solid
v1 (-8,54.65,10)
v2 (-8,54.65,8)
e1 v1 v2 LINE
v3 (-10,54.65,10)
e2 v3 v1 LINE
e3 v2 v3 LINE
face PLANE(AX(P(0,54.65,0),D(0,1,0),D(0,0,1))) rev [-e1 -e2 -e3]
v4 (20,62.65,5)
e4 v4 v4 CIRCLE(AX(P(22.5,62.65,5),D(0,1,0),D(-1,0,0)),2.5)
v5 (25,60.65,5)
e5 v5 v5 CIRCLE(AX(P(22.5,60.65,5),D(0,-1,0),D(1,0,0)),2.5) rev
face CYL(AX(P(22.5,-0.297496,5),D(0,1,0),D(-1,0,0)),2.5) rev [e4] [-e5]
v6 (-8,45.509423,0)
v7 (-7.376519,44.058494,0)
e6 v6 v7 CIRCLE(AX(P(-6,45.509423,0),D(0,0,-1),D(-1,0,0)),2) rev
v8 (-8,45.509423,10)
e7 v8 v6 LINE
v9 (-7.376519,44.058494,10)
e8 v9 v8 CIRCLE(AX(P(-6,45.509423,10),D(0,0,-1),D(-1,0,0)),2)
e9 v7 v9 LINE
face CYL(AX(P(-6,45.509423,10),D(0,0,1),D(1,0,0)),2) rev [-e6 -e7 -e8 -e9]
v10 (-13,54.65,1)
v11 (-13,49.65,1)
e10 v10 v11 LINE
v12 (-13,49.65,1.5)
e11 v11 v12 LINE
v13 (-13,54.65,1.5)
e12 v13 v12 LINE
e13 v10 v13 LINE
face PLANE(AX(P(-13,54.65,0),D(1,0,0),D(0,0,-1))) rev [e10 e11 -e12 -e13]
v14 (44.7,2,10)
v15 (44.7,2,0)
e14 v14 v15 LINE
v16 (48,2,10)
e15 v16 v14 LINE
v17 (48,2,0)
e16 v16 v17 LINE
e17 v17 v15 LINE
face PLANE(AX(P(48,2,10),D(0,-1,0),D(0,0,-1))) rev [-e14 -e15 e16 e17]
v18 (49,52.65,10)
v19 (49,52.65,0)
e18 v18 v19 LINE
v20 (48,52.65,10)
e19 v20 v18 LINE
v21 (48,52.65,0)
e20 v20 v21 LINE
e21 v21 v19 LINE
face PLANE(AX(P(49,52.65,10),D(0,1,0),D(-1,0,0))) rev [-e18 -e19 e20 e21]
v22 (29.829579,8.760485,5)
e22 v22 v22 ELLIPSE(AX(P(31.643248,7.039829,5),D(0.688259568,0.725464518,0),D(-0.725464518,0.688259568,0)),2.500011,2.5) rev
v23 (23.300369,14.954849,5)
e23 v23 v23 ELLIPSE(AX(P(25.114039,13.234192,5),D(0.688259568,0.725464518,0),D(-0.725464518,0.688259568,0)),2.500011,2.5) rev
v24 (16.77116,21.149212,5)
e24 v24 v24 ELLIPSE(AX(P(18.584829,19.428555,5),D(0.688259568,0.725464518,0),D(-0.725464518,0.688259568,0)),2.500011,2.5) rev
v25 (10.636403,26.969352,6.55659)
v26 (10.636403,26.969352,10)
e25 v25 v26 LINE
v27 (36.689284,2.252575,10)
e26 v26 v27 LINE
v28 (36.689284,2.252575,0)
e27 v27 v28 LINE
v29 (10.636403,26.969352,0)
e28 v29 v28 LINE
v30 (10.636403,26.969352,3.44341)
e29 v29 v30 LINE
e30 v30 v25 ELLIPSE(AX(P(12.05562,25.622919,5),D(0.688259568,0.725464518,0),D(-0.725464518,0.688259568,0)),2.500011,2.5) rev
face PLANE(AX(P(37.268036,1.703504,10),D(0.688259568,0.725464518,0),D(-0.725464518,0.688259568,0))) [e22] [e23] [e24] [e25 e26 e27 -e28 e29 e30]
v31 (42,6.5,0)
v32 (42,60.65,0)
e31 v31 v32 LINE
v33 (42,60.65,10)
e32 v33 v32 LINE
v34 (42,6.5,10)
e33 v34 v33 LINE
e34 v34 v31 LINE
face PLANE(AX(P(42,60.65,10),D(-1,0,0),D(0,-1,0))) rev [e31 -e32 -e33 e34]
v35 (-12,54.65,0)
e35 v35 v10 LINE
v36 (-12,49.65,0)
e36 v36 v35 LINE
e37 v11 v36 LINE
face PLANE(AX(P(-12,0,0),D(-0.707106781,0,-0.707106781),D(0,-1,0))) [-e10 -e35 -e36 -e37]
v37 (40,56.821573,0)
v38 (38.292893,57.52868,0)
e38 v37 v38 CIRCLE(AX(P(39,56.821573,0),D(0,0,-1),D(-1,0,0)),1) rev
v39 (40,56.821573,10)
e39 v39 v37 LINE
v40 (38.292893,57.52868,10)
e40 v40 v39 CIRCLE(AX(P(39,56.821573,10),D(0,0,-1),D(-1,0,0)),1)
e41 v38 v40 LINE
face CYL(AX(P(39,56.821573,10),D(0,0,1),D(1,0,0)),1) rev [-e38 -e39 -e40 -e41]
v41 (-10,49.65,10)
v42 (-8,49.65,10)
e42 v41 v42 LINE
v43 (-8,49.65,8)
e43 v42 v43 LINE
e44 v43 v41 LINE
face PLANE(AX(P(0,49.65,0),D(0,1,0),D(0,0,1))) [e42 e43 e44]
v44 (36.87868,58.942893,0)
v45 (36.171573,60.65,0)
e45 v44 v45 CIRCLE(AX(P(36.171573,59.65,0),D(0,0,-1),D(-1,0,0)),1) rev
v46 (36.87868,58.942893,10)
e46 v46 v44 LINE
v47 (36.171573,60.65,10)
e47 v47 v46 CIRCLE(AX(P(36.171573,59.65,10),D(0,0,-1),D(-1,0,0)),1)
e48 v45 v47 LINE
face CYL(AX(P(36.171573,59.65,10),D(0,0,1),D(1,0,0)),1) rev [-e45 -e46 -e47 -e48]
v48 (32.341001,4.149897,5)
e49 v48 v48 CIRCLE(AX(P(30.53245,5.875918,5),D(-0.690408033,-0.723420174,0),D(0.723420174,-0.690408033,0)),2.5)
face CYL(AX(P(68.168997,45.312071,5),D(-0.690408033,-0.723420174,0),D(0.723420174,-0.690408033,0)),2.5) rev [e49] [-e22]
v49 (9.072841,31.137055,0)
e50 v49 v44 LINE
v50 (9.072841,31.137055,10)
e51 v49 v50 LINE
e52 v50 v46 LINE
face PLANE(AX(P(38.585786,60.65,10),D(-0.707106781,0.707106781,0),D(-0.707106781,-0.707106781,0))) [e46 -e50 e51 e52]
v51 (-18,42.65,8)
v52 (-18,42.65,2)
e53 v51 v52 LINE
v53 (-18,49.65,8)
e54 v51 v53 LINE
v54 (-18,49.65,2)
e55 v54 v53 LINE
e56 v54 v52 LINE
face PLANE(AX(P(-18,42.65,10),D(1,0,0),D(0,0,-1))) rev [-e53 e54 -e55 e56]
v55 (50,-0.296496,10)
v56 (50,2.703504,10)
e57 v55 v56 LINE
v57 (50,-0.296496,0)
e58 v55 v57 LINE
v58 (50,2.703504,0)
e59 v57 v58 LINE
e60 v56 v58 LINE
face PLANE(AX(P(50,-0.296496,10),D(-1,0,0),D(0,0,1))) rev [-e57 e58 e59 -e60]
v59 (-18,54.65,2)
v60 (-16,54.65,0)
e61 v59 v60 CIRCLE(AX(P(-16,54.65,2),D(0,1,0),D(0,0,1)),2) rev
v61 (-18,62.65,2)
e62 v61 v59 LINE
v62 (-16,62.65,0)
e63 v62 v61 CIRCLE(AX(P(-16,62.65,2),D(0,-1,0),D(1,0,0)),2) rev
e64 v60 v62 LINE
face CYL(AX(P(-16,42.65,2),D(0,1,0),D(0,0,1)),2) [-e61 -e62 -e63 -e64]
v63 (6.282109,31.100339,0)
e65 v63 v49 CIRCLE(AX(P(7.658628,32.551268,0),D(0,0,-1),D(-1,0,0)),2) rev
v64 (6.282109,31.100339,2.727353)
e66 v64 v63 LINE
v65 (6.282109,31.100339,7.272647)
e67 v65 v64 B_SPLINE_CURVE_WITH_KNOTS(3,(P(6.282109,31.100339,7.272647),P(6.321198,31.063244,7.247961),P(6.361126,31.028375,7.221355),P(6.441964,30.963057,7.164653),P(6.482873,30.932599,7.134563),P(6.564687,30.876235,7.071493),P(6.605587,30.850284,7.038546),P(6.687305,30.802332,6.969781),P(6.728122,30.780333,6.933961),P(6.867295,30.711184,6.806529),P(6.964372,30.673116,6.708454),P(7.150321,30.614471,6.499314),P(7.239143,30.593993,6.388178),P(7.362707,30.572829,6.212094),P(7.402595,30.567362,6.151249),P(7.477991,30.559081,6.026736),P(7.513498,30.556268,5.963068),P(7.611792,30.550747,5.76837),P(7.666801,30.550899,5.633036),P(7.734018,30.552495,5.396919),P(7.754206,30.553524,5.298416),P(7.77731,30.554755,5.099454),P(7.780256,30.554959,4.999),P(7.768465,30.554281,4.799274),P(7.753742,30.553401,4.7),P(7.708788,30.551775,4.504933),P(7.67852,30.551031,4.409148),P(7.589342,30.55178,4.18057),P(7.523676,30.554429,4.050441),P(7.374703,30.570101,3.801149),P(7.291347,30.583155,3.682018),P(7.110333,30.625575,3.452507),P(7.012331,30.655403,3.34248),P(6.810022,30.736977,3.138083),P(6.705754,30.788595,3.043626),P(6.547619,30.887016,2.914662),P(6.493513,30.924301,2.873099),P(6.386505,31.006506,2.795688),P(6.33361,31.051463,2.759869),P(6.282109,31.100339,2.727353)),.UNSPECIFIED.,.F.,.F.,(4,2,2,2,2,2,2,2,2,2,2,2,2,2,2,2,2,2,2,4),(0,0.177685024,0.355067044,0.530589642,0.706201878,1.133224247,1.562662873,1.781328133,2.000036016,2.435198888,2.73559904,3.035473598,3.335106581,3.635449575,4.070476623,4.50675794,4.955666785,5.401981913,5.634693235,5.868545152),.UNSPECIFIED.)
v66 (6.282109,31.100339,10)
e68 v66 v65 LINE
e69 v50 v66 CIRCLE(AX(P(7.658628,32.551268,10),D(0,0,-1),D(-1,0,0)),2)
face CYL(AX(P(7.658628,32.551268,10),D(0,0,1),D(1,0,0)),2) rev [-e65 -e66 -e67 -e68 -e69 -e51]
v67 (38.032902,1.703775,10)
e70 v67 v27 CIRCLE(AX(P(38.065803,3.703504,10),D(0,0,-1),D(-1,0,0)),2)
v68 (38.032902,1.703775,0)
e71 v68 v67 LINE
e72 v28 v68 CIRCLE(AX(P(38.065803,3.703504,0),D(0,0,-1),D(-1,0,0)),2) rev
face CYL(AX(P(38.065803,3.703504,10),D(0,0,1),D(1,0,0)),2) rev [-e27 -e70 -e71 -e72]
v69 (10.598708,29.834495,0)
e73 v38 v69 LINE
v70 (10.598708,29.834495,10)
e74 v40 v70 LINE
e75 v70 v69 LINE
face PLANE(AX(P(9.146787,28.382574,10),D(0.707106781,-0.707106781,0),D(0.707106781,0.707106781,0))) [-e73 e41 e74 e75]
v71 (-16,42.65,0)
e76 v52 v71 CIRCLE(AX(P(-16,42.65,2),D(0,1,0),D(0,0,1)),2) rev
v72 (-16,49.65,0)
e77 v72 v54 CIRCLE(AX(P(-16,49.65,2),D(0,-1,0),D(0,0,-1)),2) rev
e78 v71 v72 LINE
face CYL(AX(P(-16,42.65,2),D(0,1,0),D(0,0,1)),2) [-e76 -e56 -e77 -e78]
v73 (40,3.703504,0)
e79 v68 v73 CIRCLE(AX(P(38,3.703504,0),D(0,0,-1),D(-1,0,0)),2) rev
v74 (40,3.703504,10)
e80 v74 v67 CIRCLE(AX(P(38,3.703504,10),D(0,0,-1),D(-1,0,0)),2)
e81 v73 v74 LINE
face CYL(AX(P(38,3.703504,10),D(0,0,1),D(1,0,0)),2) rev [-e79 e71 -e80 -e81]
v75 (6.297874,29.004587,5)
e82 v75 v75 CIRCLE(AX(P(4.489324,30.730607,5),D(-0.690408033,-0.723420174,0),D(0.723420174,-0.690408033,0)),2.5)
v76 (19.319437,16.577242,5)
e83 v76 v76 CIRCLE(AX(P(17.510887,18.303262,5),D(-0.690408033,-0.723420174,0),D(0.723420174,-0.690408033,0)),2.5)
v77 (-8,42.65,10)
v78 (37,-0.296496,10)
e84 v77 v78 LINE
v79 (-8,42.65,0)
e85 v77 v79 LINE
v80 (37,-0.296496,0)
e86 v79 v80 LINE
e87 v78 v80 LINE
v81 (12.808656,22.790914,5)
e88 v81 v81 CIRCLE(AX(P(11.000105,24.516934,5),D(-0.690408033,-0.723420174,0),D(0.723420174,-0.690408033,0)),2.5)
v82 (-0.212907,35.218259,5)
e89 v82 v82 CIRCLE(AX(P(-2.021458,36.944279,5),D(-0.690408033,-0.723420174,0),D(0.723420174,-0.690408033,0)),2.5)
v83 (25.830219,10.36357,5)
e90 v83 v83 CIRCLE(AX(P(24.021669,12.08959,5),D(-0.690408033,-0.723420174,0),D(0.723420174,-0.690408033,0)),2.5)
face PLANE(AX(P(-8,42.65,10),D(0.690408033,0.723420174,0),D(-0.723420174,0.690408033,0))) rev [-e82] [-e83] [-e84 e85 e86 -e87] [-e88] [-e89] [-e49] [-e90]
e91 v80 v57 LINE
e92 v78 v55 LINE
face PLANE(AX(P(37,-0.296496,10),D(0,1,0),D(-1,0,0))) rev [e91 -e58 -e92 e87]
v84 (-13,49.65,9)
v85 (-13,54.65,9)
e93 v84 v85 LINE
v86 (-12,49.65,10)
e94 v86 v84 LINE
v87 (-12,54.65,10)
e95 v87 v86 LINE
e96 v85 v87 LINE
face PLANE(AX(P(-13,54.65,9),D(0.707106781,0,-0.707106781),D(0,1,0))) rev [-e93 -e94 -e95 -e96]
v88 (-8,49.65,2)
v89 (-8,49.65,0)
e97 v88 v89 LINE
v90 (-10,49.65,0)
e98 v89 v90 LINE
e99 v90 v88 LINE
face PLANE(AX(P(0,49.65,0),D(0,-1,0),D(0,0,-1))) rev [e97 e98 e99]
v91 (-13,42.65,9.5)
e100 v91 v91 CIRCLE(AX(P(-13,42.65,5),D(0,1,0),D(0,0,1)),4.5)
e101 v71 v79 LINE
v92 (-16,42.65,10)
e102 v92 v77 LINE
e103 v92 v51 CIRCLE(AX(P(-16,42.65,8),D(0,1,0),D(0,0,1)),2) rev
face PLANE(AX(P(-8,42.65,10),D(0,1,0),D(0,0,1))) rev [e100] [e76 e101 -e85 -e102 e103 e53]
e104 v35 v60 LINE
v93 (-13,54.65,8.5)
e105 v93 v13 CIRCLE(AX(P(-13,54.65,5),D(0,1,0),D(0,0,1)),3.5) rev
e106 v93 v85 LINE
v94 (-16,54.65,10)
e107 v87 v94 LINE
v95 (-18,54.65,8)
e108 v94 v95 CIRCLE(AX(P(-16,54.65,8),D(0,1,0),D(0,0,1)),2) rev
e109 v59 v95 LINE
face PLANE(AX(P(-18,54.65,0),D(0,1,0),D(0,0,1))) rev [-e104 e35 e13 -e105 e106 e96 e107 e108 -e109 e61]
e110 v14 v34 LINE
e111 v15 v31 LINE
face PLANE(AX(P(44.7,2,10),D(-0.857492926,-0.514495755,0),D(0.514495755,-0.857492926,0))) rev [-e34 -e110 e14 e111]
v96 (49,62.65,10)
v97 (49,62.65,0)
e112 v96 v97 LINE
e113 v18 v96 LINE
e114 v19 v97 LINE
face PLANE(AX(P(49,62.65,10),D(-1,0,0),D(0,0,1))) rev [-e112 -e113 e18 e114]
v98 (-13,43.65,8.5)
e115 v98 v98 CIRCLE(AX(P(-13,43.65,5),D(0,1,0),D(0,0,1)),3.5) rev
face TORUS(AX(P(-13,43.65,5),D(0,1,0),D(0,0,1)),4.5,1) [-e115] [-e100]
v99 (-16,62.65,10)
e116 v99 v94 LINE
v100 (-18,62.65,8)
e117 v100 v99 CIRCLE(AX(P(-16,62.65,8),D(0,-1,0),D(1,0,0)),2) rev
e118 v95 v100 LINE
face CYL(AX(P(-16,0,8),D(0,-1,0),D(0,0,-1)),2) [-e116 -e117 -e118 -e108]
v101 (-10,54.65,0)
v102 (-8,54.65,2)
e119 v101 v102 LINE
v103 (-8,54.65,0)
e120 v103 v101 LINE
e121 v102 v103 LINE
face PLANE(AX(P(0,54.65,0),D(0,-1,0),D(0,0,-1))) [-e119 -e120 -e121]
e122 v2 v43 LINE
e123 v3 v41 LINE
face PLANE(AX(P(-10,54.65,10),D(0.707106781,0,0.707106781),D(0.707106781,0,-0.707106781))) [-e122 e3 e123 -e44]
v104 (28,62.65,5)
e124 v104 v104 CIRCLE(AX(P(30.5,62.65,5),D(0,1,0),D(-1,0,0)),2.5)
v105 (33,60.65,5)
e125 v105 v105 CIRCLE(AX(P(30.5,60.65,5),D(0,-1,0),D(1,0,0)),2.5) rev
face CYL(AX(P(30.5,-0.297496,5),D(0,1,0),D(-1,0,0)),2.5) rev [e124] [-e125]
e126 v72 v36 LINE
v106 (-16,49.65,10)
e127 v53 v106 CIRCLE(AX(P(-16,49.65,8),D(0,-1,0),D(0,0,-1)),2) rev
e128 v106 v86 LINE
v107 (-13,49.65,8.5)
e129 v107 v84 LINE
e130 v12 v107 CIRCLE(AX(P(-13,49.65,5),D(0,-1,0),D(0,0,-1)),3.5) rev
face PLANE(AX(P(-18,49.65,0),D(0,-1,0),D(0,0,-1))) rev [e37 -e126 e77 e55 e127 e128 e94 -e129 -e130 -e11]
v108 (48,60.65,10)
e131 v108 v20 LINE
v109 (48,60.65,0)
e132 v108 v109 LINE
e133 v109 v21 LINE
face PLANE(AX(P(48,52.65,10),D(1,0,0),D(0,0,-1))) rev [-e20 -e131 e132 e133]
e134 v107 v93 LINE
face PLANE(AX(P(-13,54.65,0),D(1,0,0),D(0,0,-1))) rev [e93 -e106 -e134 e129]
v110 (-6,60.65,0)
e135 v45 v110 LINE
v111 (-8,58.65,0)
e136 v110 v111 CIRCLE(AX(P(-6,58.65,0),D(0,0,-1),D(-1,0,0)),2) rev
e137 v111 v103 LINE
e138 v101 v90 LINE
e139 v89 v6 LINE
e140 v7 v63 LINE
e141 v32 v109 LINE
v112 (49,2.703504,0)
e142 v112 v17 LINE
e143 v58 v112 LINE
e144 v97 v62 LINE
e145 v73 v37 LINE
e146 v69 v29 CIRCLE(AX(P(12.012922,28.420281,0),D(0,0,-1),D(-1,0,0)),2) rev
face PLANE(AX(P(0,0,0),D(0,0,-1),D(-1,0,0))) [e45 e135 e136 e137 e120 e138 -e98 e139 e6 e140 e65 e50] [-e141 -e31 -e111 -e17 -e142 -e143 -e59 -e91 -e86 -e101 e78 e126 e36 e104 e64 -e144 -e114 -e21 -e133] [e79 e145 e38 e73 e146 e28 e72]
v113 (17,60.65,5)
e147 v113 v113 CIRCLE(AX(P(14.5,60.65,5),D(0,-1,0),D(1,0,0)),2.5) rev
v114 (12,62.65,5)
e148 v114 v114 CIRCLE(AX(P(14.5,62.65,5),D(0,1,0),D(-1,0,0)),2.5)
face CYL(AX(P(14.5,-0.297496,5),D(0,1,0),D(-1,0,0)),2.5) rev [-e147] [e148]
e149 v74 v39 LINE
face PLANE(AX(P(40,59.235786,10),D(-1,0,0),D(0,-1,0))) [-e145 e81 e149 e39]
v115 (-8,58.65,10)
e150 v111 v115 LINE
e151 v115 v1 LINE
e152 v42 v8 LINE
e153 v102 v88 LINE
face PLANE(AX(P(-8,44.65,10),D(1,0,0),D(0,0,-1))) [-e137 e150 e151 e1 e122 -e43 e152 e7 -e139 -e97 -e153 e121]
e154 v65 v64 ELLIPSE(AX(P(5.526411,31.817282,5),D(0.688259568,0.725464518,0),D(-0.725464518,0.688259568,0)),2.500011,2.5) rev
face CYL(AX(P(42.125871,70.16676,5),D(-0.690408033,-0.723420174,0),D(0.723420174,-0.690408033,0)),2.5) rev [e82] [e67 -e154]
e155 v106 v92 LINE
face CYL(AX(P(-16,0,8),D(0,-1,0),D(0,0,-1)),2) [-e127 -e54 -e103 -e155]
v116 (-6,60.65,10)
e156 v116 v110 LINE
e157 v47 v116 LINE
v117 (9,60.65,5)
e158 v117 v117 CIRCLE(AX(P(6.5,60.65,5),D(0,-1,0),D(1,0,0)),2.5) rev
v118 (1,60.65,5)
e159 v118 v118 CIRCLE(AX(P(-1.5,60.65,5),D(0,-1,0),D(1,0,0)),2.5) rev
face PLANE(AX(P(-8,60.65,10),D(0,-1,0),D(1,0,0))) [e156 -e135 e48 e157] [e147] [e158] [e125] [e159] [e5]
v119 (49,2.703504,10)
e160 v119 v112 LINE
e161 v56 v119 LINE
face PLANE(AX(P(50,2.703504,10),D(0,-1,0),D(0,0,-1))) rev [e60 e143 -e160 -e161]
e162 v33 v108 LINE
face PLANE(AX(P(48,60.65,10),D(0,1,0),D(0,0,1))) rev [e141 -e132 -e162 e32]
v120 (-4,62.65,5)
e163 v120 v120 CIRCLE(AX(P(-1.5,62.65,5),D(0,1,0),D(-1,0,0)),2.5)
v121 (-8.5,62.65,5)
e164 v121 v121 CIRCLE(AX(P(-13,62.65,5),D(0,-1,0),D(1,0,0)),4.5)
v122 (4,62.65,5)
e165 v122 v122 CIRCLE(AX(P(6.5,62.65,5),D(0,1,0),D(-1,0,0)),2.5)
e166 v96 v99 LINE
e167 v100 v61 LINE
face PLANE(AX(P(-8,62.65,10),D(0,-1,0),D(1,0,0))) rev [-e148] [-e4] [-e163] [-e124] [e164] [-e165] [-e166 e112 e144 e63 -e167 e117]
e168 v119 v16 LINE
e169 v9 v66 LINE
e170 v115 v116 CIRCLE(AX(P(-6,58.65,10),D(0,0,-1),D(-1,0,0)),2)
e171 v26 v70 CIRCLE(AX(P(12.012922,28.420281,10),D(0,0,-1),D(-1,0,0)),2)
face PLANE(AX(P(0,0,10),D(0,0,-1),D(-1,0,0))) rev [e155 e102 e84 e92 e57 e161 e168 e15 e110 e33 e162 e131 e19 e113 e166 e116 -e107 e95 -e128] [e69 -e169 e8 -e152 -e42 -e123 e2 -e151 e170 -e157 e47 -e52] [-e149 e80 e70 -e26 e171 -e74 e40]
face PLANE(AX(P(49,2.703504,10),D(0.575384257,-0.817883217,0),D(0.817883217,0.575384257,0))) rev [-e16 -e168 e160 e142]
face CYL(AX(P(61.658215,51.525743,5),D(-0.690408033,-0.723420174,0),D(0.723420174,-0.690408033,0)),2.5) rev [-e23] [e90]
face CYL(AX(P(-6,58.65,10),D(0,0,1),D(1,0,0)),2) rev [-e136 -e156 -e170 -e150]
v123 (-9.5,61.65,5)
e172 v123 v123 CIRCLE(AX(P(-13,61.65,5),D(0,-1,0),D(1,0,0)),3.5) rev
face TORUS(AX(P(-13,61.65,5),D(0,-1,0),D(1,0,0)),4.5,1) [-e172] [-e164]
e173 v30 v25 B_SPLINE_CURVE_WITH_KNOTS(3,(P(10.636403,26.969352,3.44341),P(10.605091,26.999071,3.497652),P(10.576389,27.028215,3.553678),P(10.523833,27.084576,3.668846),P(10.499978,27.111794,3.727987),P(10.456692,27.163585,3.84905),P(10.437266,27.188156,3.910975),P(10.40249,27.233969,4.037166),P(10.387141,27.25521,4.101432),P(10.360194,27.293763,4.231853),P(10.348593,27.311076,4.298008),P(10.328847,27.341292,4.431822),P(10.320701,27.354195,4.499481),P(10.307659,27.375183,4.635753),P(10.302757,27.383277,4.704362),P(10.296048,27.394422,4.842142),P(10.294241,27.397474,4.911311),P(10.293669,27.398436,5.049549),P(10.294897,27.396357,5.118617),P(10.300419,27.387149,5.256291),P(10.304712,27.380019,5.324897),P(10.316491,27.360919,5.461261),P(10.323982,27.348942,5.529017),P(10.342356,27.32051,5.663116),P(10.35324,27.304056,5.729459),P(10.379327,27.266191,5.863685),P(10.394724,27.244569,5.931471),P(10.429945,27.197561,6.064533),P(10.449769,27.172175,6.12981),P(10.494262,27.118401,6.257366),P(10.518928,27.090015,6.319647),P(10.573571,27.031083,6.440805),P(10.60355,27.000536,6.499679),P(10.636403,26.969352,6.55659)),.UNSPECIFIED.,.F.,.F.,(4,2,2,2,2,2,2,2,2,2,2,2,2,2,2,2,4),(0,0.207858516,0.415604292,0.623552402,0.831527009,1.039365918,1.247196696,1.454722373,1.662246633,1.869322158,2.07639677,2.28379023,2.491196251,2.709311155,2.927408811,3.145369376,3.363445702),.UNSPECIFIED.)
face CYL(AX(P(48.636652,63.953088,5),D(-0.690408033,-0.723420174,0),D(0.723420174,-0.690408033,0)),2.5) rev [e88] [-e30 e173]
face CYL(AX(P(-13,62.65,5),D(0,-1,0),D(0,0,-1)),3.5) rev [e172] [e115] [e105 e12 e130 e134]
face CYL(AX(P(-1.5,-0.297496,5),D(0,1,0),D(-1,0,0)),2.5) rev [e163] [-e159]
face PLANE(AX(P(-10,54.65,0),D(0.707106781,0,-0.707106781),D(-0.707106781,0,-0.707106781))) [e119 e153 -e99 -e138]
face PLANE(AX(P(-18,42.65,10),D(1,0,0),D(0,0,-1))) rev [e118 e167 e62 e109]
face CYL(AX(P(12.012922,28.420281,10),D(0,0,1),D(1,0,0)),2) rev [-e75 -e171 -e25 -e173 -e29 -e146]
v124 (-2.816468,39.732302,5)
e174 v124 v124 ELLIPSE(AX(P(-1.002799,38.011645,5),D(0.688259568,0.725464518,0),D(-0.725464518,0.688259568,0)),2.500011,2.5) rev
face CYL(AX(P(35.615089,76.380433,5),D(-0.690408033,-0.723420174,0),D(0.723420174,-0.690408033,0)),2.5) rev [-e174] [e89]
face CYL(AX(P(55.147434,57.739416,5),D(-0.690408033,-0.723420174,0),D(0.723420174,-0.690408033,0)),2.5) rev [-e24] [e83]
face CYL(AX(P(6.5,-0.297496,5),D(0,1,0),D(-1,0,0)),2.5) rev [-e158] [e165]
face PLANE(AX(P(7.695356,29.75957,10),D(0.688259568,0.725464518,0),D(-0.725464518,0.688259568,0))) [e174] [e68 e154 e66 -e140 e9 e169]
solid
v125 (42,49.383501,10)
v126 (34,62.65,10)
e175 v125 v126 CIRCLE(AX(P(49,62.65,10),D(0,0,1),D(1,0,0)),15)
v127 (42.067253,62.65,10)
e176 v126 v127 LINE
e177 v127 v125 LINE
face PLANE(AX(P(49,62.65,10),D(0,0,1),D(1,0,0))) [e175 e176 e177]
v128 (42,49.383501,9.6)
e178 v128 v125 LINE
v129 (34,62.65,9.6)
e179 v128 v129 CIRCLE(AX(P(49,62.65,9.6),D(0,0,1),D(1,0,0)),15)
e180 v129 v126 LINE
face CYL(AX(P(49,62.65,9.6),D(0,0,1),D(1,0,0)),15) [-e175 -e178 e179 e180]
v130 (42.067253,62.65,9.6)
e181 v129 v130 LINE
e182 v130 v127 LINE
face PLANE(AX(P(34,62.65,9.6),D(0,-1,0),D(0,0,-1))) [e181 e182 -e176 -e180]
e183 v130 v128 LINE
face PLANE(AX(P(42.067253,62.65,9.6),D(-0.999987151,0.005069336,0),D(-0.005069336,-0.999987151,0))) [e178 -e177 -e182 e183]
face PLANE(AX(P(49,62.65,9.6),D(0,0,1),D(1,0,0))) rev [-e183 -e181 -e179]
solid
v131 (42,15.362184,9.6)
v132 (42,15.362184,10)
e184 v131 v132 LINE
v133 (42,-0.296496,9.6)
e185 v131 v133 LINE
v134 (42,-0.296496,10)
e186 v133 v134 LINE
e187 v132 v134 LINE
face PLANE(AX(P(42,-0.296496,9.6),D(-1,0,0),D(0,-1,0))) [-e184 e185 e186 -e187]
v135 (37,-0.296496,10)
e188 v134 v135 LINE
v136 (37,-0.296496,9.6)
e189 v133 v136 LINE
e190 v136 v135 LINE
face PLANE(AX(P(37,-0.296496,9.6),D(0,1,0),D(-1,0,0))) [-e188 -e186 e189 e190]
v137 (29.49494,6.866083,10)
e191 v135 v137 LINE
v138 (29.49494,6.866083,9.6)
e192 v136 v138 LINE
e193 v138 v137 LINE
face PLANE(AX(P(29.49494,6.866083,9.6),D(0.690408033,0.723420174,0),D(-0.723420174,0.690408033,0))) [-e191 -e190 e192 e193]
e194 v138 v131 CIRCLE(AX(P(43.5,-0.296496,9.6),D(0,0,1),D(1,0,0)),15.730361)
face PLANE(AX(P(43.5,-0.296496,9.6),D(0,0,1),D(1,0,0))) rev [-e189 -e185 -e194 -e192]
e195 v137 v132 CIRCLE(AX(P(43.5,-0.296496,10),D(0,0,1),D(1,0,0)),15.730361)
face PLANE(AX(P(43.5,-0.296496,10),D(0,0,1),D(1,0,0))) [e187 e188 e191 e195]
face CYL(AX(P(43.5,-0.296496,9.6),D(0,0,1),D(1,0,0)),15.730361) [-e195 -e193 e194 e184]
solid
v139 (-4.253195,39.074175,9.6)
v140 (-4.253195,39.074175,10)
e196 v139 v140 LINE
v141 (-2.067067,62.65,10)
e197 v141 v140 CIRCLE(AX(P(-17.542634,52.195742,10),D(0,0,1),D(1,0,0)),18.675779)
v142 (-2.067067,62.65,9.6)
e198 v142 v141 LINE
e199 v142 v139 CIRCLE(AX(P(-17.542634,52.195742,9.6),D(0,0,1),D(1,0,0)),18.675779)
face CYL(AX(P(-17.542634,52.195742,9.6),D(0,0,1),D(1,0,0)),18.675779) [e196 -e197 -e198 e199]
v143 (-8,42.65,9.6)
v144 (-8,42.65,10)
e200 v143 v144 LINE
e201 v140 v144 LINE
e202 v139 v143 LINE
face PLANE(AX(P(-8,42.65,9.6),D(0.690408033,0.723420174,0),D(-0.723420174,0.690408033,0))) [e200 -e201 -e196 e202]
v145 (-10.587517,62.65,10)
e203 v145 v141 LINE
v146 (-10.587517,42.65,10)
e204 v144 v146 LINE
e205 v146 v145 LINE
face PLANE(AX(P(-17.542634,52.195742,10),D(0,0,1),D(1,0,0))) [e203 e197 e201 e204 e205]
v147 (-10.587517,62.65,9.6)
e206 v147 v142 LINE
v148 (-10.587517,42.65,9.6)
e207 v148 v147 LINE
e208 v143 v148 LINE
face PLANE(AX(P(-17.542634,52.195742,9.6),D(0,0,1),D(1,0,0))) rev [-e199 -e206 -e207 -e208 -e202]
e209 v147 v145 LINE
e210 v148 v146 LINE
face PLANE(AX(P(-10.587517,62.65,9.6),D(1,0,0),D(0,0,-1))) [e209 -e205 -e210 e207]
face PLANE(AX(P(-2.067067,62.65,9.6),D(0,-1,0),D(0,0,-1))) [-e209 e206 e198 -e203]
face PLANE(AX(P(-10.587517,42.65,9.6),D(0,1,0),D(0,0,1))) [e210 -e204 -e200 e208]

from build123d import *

# Parameters (mm, degrees)
FRAME_DEPTH         = 10
SKETCH13_R          = 3.5
CUT_EXTRUDE7_DEPTH  = 67.66634461
FILLET4_R           = 1
SKETCH14_W          = 5
SKETCH14_H          = 5
CUT_EXTRUDE8_DEPTH  = 81.777611378
FILLET5_R           = 2
CUT_EXTRUDE9_DEPTH  = 5
CHAMFER1_SIZE       = 1
FILLET6_R           = 2
FILLET7_R           = 1
CUT_EXTRUDE11_REACH = 59.656
SKETCH18_R          = 2.5
CUT_EXTRUDE12_REACH = 83.008
SKETCH19_R          = 2.5
EARS_DEPTH          = 0.4
EARS_2_DEPTH        = 0.4
EARS_3_DEPTH        = 0.4


with BuildPart() as part:
    # Sketch1 → Frame (new body)
    with BuildSketch(Plane.XY):
        Polygon((-8, 62.65), (49, 62.65), (49, 52.65), (48, 52.65), (48, 60.65), (42, 60.65), (42, 6.5), (44.7, 2), (48, 2), (49, 2.703504174), (50, 2.703504174), (50, -0.296495826), (37, -0.296495826), (-8, 42.65), (-18, 42.65), (-18, 62.65), align=None)
        Polygon((-8, 44.65), (-8, 60.65), (38.585786438, 60.65), (7.695355997, 29.759569559), align=None, mode=Mode.SUBTRACT)
        Polygon((40, 59.235786438), (40, 1.703504174), (37.268035971, 1.703504174), (9.146787391, 28.382573828), align=None, mode=Mode.SUBTRACT)
    extrude(amount=FRAME_DEPTH)

    # Sketch13 → Cut-Extrude7 (cut, through all)
    with BuildSketch(Plane.XZ.offset(-42.65)):
        with Locations(Location((-13, 5, 0), (0, 0, 270))):
            Circle(SKETCH13_R)
    extrude(amount=-CUT_EXTRUDE7_DEPTH, mode=Mode.SUBTRACT)

    # Fillet4
    fillet4_edges = [part.edges().sort_by_distance(p)[0] for p in [
        (-13, 62.65, 8.5),
        (-13, 42.65, 8.5),
    ]]
    fillet(fillet4_edges, radius=FILLET4_R)

    # Sketch14 → Cut-Extrude8 (cut, through all)
    with BuildSketch(Plane.XY.offset(10)):
        with Locations((-15.5, 52.15)):
            Rectangle(SKETCH14_W, SKETCH14_H)
    extrude(amount=-CUT_EXTRUDE8_DEPTH, mode=Mode.SUBTRACT)

    # Fillet5
    fillet5_edges = [part.edges().sort_by_distance(p)[0] for p in [
        (-18, 58.65, 0),
        (-18, 58.65, 10),
        (-18, 46.15, 0),
        (-18, 46.15, 10),
    ]]
    fillet(fillet5_edges, radius=FILLET5_R)

    # Sketch15 → Cut-Extrude9 (cut)
    with BuildSketch(Plane(origin=(0, 49.65, 0), x_dir=(1, 0, 0), z_dir=(0, 1, 0))):
        Polygon((-10, 0), (-8, -2), (-8, 0), align=None)
        Polygon((-10, -10), (-8, -8), (-8, -10), align=None)
    extrude(amount=CUT_EXTRUDE9_DEPTH, mode=Mode.SUBTRACT)

    # Chamfer1
    chamfer1_edges = [part.edges().sort_by_distance(p)[0] for p in [
        (-13, 52.15, 0),
        (-13, 52.15, 10),
    ]]
    chamfer(chamfer1_edges, length=CHAMFER1_SIZE)

    # Fillet6
    # the kernel refuses this fillet: 2 mm, written as the material it adds along each edge
    with BuildSketch(Plane(origin=(-8, 60.65, 0), x_dir=(0, -1, 0), z_dir=(0, 0, 1)), Plane(origin=(40, 1.703504174, 0), x_dir=(0, 1, 0), z_dir=(0, 0, 1))) as fillet6_piece_1:
        with BuildLine():
            CenterArc((FILLET6_R, FILLET6_R), FILLET6_R, 180, 90)
            Line((0, FILLET6_R), (0, 0))
            Line((0, 0), (FILLET6_R, 0))
        make_face()
    extrude(amount=10)
    with BuildSketch(Plane(origin=(37.268035971, 1.703504174, 0), x_dir=(1, 0, 0), z_dir=(0, 0, 1))) as fillet6_piece_2:
        with BuildLine():
            CenterArc((FILLET6_R * 0.398883640348, FILLET6_R), FILLET6_R, 226.507503973, 43.492496027)
            Line((-FILLET6_R * 0.289375927855, FILLET6_R * 0.274535482069), (0, 0))
            Line((0, 0), (FILLET6_R * 0.398883640348, 0))
        make_face()
    extrude(amount=10)
    with BuildSketch(Plane(origin=(-8, 44.65, 0), x_dir=(0, 1, 0), z_dir=(0, 0, 1))) as fillet6_piece_3:
        with BuildLine():
            CenterArc((FILLET6_R * 0.429711480151, -FILLET6_R), FILLET6_R, 90, 46.507503973)
            Line((-FILLET6_R * 0.29575303778, -FILLET6_R * 0.311740431797), (0, 0))
            Line((0, 0), (FILLET6_R * 0.429711480151, 0))
        make_face()
    extrude(amount=10)
    with BuildSketch(Plane(origin=(9.146787391, 28.382573828, 0), x_dir=(0.7254645179309741, -0.6882595682031448, 0), z_dir=(0, 0, 1))) as fillet6_piece_4:
        with BuildLine():
            CenterArc((FILLET6_R * 1.02666321267, FILLET6_R), FILLET6_R, 178.492496027, 91.507503973)
            Line((FILLET6_R * 0.0270093246389, FILLET6_R * 1.02630787225), (0, 0))
            Line((0, 0), (FILLET6_R * 1.02666321267, 0))
        make_face()
    extrude(amount=10)
    with BuildSketch(Plane(origin=(7.695355997, 29.759569559, 0), x_dir=(0.7071067811865478, 0.7071067811865474, 0), z_dir=(0, 0, 1))) as fillet6_piece_5:
        with BuildLine():
            CenterArc((FILLET6_R * 0.974029250934, FILLET6_R), FILLET6_R, 181.507503973, 88.492496027)
            Line((-FILLET6_R * 0.0256246370977, FILLET6_R * 0.973692127754), (0, 0))
            Line((0, 0), (FILLET6_R * 0.974029250934, 0))
        make_face()
    extrude(amount=10)

    # Fillet7
    fillet7_edges = [part.edges().sort_by_distance(p)[0] for p in [
        (38.585786438, 60.65, 5),
        (40, 59.235786438, 5),
    ]]
    fillet(fillet7_edges, radius=FILLET7_R)

    # Sketch18 → Cut-Extrude11 (cut, up to next)
    with BuildSketch(Plane(origin=(17.488453969, 18.324671512, 0), x_dir=(0.7234201739583832, -0.6904080329124386, 0), z_dir=(-0.6904080329124386, -0.7234201739583832, 0)), mode=Mode.PRIVATE) as cut_extrude11_sk1:
        with Locations((-26.968990252, 5)):
            Circle(SKETCH18_R)
    cut_extrude11_tool1 = extrude(cut_extrude11_sk1.sketch, amount=-CUT_EXTRUDE11_REACH, mode=Mode.PRIVATE) & part.part
    # Sketch18 → Cut-Extrude11 (cut, up to next)
    with BuildSketch(Plane(origin=(17.488453969, 18.324671512, 0), x_dir=(0.7234201739583832, -0.6904080329124386, 0), z_dir=(-0.6904080329124386, -0.7234201739583832, 0)), mode=Mode.PRIVATE) as cut_extrude11_sk2:
        with Locations((-17.968990252, 5)):
            Circle(SKETCH18_R)
    cut_extrude11_tool2 = extrude(cut_extrude11_sk2.sketch, amount=-CUT_EXTRUDE11_REACH, mode=Mode.PRIVATE) & part.part
    # Sketch18 → Cut-Extrude11 (cut, up to next)
    with BuildSketch(Plane(origin=(17.488453969, 18.324671512, 0), x_dir=(0.7234201739583832, -0.6904080329124386, 0), z_dir=(-0.6904080329124386, -0.7234201739583832, 0)), mode=Mode.PRIVATE) as cut_extrude11_sk3:
        with Locations((-8.968990252, 5)):
            Circle(SKETCH18_R)
    cut_extrude11_tool3 = extrude(cut_extrude11_sk3.sketch, amount=-CUT_EXTRUDE11_REACH, mode=Mode.PRIVATE) & part.part
    # Sketch18 → Cut-Extrude11 (cut, up to next)
    with BuildSketch(Plane(origin=(17.488453969, 18.324671512, 0), x_dir=(0.7234201739583832, -0.6904080329124386, 0), z_dir=(-0.6904080329124386, -0.7234201739583832, 0)), mode=Mode.PRIVATE) as cut_extrude11_sk4:
        with Locations((0.031009748, 5)):
            Circle(SKETCH18_R)
    cut_extrude11_tool4 = extrude(cut_extrude11_sk4.sketch, amount=-CUT_EXTRUDE11_REACH, mode=Mode.PRIVATE) & part.part
    # Sketch18 → Cut-Extrude11 (cut, up to next)
    with BuildSketch(Plane(origin=(17.488453969, 18.324671512, 0), x_dir=(0.7234201739583832, -0.6904080329124386, 0), z_dir=(-0.6904080329124386, -0.7234201739583832, 0)), mode=Mode.PRIVATE) as cut_extrude11_sk5:
        with Locations((9.031009748, 5)):
            Circle(SKETCH18_R)
    cut_extrude11_tool5 = extrude(cut_extrude11_sk5.sketch, amount=-CUT_EXTRUDE11_REACH, mode=Mode.PRIVATE) & part.part
    # Sketch18 → Cut-Extrude11 (cut, up to next)
    with BuildSketch(Plane(origin=(17.488453969, 18.324671512, 0), x_dir=(0.7234201739583832, -0.6904080329124386, 0), z_dir=(-0.6904080329124386, -0.7234201739583832, 0)), mode=Mode.PRIVATE) as cut_extrude11_sk6:
        with Locations((18.031009748, 5)):
            Circle(SKETCH18_R)
    cut_extrude11_tool6 = extrude(cut_extrude11_sk6.sketch, amount=-CUT_EXTRUDE11_REACH, mode=Mode.PRIVATE) & part.part
    add(cut_extrude11_tool1.solids().sort_by_distance((-2.021458, 36.944279, 5))[0], mode=Mode.SUBTRACT)
    add(cut_extrude11_tool2.solids().sort_by_distance((4.489324, 30.730607, 5))[0], mode=Mode.SUBTRACT)
    add(cut_extrude11_tool3.solids().sort_by_distance((11.000105, 24.516934, 5))[0], mode=Mode.SUBTRACT)
    add(cut_extrude11_tool4.solids().sort_by_distance((17.510887, 18.303262, 5))[0], mode=Mode.SUBTRACT)
    add(cut_extrude11_tool5.solids().sort_by_distance((24.021669, 12.08959, 5))[0], mode=Mode.SUBTRACT)
    add(cut_extrude11_tool6.solids().sort_by_distance((30.53245, 5.875918, 5))[0], mode=Mode.SUBTRACT)

    # Sketch19 → Cut-Extrude12 (cut, up to next)
    with BuildSketch(Plane(origin=(0, 62.65, 0), x_dir=(1, 0, 0), z_dir=(0, 1, 0)), mode=Mode.PRIVATE) as cut_extrude12_sk1:
        with Locations(Location((-1.5, -5, 0), (0, 0, 180))):
            Circle(SKETCH19_R)
    cut_extrude12_tool1 = extrude(cut_extrude12_sk1.sketch, amount=-CUT_EXTRUDE12_REACH, mode=Mode.PRIVATE) & part.part
    # Sketch19 → Cut-Extrude12 (cut, up to next)
    with BuildSketch(Plane(origin=(0, 62.65, 0), x_dir=(1, 0, 0), z_dir=(0, 1, 0)), mode=Mode.PRIVATE) as cut_extrude12_sk2:
        with Locations(Location((6.5, -5, 0), (0, 0, 180))):
            Circle(SKETCH19_R)
    cut_extrude12_tool2 = extrude(cut_extrude12_sk2.sketch, amount=-CUT_EXTRUDE12_REACH, mode=Mode.PRIVATE) & part.part
    # Sketch19 → Cut-Extrude12 (cut, up to next)
    with BuildSketch(Plane(origin=(0, 62.65, 0), x_dir=(1, 0, 0), z_dir=(0, 1, 0)), mode=Mode.PRIVATE) as cut_extrude12_sk3:
        with Locations(Location((14.5, -5, 0), (0, 0, 180))):
            Circle(SKETCH19_R)
    cut_extrude12_tool3 = extrude(cut_extrude12_sk3.sketch, amount=-CUT_EXTRUDE12_REACH, mode=Mode.PRIVATE) & part.part
    # Sketch19 → Cut-Extrude12 (cut, up to next)
    with BuildSketch(Plane(origin=(0, 62.65, 0), x_dir=(1, 0, 0), z_dir=(0, 1, 0)), mode=Mode.PRIVATE) as cut_extrude12_sk4:
        with Locations(Location((22.5, -5, 0), (0, 0, 180))):
            Circle(SKETCH19_R)
    cut_extrude12_tool4 = extrude(cut_extrude12_sk4.sketch, amount=-CUT_EXTRUDE12_REACH, mode=Mode.PRIVATE) & part.part
    # Sketch19 → Cut-Extrude12 (cut, up to next)
    with BuildSketch(Plane(origin=(0, 62.65, 0), x_dir=(1, 0, 0), z_dir=(0, 1, 0)), mode=Mode.PRIVATE) as cut_extrude12_sk5:
        with Locations(Location((30.5, -5, 0), (0, 0, 180))):
            Circle(SKETCH19_R)
    cut_extrude12_tool5 = extrude(cut_extrude12_sk5.sketch, amount=-CUT_EXTRUDE12_REACH, mode=Mode.PRIVATE) & part.part
    add(cut_extrude12_tool1.solids().sort_by_distance((-1.5, 62.65, 5))[0], mode=Mode.SUBTRACT)
    add(cut_extrude12_tool2.solids().sort_by_distance((6.5, 62.65, 5))[0], mode=Mode.SUBTRACT)
    add(cut_extrude12_tool3.solids().sort_by_distance((14.5, 62.65, 5))[0], mode=Mode.SUBTRACT)
    add(cut_extrude12_tool4.solids().sort_by_distance((22.5, 62.65, 5))[0], mode=Mode.SUBTRACT)
    add(cut_extrude12_tool5.solids().sort_by_distance((30.5, 62.65, 5))[0], mode=Mode.SUBTRACT)


with BuildPart() as body_2:
    # Sketch17 → ears (new body)
    with BuildSketch(Plane.XY.offset(10)):
        with BuildLine():
            Line((34, 62.65), (42.067253202, 62.65))
            Line((42.067253202, 62.65), (42, 49.383500839))
            ThreePointArc((42, 49.383500839), (61.845232579, 70.395966692), (34, 62.65))
        make_face()
    extrude(amount=-EARS_DEPTH)


with BuildPart() as body_3:
    # Sketch17 → ears 2 (new body)
    with BuildSketch(Plane.XY.offset(10)):
        with BuildLine():
            Line((29.494939575, 6.866082979), (37, -0.296495826))
            Line((37, -0.296495826), (42, -0.296495826))
            Line((42, -0.296495826), (42, 15.362183961))
            ThreePointArc((42, 15.362183961), (52.340116383, -13.307898324), (29.494939575, 6.866082979))
        make_face()
    extrude(amount=-EARS_2_DEPTH)


with BuildPart() as body_4:
    # Sketch17 → ears 3 (new body)
    with BuildSketch(Plane.XY.offset(10)):
        with BuildLine():
            Line((-2.067066812, 62.65), (-10.587516805, 62.65))
            Line((-10.587516805, 62.65), (-10.587516805, 42.65))
            Line((-10.587516805, 42.65), (-8, 42.65))
            Line((-8, 42.65), (-4.253195402, 39.074174932))
            ThreePointArc((-4.253195402, 39.074174932), (-36.138636082, 53.920103565), (-2.067066812, 62.65))
        make_face()
    extrude(amount=-EARS_3_DEPTH)


solid = Compound([part.part, body_2.part, body_3.part, body_4.part])
